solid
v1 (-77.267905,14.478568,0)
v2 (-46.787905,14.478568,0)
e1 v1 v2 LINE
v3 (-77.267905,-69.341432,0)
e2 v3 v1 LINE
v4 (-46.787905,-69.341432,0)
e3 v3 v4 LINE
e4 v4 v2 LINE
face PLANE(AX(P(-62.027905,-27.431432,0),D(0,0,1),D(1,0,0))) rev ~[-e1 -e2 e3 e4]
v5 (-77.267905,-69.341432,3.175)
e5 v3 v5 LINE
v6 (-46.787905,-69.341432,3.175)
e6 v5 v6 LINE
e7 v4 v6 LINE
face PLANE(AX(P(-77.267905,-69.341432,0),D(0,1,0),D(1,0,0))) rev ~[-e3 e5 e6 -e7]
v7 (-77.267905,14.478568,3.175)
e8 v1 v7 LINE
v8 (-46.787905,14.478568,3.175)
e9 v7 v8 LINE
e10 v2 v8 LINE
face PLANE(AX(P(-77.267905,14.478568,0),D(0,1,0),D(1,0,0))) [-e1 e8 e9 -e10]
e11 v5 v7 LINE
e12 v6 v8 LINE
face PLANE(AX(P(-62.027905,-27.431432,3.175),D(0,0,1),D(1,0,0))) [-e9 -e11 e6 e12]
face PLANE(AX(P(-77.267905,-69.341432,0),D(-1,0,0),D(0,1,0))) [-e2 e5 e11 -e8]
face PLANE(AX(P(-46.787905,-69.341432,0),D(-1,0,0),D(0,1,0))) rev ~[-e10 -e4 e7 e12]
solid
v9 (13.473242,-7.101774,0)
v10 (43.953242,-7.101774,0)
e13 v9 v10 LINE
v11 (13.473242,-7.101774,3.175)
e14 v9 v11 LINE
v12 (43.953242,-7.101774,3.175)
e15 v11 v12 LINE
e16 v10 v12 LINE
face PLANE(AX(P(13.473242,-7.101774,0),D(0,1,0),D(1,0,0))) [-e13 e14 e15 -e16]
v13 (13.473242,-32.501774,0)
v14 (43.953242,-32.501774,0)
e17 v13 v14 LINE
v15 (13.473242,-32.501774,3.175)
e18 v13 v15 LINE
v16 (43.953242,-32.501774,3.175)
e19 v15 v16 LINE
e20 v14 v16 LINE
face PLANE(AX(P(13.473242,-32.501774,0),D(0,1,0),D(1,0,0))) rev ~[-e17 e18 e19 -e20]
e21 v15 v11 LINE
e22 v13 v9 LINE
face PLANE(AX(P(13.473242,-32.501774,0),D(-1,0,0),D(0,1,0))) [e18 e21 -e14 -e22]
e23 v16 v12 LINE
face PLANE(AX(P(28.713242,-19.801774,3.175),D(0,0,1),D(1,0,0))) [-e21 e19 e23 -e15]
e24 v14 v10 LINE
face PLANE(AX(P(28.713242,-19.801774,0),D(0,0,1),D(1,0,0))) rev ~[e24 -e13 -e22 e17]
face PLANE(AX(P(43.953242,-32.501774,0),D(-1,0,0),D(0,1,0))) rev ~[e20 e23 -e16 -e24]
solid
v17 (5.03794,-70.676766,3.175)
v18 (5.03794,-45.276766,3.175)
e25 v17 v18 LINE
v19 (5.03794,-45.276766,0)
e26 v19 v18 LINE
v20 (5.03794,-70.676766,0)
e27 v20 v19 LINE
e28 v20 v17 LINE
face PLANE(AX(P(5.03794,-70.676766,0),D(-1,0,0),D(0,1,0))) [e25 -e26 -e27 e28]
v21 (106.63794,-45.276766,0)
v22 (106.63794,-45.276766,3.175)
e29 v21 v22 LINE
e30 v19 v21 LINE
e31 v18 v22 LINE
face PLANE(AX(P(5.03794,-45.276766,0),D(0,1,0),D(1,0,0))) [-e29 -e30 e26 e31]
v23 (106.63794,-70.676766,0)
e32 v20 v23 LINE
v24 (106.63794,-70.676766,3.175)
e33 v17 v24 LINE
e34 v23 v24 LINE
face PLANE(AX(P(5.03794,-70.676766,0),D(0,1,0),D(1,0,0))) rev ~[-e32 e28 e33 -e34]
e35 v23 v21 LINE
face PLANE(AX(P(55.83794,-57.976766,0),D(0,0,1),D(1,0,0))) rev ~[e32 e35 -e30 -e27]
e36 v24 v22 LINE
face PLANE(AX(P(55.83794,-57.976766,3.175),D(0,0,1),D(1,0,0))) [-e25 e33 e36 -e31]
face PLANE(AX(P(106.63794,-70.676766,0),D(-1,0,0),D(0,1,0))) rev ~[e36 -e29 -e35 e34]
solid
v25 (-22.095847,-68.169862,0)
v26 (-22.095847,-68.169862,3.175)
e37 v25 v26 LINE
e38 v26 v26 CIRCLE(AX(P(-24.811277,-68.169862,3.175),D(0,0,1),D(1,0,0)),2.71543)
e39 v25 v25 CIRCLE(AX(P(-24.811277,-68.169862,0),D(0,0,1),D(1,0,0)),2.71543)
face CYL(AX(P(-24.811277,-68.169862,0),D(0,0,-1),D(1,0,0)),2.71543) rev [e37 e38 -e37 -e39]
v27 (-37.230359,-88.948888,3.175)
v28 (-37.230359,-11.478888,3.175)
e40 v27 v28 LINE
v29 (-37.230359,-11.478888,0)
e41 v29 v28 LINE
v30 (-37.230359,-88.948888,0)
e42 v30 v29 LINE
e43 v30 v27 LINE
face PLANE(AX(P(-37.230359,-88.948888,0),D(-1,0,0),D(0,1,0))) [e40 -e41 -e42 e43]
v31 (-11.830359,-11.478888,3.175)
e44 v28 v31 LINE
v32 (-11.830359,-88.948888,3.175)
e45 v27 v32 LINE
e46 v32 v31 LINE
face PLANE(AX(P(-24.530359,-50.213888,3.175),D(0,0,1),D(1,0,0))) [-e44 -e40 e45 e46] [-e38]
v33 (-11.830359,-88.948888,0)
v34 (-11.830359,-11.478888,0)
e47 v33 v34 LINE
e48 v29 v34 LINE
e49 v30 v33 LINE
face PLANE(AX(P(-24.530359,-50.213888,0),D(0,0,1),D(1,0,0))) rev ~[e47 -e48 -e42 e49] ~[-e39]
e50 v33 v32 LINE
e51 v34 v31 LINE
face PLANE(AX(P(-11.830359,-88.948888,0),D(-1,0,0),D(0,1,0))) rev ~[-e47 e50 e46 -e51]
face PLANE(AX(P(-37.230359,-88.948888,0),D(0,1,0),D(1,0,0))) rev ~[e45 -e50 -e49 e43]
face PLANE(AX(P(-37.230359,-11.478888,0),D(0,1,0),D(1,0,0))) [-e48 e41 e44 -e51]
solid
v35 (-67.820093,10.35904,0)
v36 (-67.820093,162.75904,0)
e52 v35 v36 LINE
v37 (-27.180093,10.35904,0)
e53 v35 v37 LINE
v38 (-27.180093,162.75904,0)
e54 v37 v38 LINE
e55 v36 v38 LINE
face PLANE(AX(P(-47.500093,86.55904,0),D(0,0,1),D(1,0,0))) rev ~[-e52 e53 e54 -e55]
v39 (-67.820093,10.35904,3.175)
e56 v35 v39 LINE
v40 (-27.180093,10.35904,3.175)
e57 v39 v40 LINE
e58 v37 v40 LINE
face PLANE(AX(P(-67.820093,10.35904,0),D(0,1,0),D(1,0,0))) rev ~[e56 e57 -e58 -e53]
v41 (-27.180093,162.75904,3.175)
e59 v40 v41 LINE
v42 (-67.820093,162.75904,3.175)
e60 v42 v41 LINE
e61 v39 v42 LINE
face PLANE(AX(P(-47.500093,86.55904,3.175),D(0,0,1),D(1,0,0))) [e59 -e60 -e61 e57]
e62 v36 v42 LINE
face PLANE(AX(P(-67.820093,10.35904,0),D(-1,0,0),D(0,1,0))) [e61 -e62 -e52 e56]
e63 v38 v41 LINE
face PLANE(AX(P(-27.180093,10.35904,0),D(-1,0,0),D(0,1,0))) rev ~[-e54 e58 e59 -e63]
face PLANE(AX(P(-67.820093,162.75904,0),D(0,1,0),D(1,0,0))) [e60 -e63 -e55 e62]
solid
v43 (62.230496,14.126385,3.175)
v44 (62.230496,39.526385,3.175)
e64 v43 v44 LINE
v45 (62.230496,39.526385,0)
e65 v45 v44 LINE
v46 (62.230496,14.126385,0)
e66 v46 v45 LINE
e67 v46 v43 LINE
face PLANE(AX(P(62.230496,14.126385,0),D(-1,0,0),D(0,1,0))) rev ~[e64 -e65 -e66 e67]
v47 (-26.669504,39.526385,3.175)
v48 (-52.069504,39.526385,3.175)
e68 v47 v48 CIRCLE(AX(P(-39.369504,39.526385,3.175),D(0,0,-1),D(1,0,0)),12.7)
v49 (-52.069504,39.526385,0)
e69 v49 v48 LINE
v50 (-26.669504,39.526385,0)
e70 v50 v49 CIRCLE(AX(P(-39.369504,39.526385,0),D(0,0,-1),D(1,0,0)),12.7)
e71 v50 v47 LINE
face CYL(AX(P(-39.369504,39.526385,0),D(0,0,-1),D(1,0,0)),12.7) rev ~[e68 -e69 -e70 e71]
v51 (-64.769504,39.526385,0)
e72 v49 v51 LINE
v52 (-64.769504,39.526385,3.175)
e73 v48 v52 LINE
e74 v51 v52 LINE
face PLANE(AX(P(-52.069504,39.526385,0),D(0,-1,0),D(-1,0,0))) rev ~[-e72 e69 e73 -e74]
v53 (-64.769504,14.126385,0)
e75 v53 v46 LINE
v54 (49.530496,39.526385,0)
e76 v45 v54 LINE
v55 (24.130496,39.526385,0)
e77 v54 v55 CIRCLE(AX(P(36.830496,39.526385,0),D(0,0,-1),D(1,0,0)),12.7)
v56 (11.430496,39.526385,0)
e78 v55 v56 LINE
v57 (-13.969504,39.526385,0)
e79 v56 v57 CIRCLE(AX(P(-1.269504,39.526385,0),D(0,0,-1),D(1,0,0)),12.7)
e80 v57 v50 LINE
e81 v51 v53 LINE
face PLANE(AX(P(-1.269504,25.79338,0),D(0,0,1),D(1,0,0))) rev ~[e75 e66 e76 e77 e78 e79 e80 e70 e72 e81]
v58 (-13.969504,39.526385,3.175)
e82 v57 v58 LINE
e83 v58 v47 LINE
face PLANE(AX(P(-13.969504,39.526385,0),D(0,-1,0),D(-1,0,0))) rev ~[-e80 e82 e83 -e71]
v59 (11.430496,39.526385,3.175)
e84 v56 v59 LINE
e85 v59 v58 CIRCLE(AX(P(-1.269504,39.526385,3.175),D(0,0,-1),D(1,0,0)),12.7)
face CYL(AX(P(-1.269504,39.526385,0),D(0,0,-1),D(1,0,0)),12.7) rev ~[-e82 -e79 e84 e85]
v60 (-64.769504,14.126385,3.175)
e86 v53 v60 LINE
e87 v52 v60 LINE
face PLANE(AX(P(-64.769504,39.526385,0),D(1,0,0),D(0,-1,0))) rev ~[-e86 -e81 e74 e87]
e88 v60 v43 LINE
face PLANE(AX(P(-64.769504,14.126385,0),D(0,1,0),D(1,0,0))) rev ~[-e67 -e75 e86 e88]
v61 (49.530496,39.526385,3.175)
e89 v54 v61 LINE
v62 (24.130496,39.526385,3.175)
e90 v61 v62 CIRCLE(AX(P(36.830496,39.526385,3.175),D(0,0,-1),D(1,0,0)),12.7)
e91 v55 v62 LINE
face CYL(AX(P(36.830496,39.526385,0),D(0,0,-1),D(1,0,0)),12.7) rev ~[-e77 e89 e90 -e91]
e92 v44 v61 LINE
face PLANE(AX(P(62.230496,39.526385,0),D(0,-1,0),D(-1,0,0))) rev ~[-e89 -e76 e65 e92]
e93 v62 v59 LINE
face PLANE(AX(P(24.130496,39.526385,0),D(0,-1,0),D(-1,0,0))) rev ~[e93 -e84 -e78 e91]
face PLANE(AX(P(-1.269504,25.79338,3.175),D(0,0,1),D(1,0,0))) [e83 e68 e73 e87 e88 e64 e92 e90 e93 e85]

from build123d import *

# Parameters (mm, degrees)
F1_DEPTH  = 3.175
F2_W      = 30.48
F2_H      = 83.82
F3_DEPTH  = 3.175
F4_W      = 25.4
F4_H      = 77.47
F4_R      = 2.7154298689
F5_DEPTH  = 3.175
F6_W      = 30.48
F6_H      = 25.4
F7_DEPTH  = 3.175
F8_W      = 101.6
F8_H      = 25.4
F9_DEPTH  = 3.175
F10_W     = 40.64
F10_H     = 152.4
F11_DEPTH = 3.175


# Not quite as in the source:
# - a length typed as a fraction of an inch, garbled in the dataset ("3 / 203.2 mm" for 3/8 in), is restored


with BuildPart() as f1:
    # F0 (on Top) → F1 (new body)
    with BuildSketch(Plane.XY):
        with BuildLine():
            Line((-52.0695035428, 39.5263851967), (-64.7695035428, 39.5263851967))
            Line((-64.7695035428, 39.5263851967), (-64.7695035428, 14.1263851967))
            Line((-64.7695035428, 14.1263851967), (62.2304964572, 14.1263851967))
            Line((62.2304964572, 14.1263851967), (62.2304964572, 39.5263851967))
            Line((62.2304964572, 39.5263851967), (49.5304964572, 39.5263851967))
            ThreePointArc((49.5304964572, 39.5263851967), (36.8304964572, 26.8263851967), (24.1304964572, 39.5263851967))
            Line((24.1304964572, 39.5263851967), (11.4304964572, 39.5263851967))
            ThreePointArc((11.4304964572, 39.5263851967), (-1.2695035428, 26.8263851967), (-13.9695035428, 39.5263851967))
            Line((-13.9695035428, 39.5263851967), (-26.6695035428, 39.5263851967))
            ThreePointArc((-26.6695035428, 39.5263851967), (-39.3695035428, 26.8263851967), (-52.0695035428, 39.5263851967))
        make_face()
    extrude(amount=F1_DEPTH)


with BuildPart() as f3:
    # F2 (on Top) → F3 (new body)
    with BuildSketch(Plane.XY):
        with Locations((-62.027904564, -27.4314320334)):
            Rectangle(F2_W, F2_H)
    extrude(amount=F3_DEPTH)


with BuildPart() as f5:
    # F4 (on Top) → F5 (new body)
    with BuildSketch(Plane.XY):
        with Locations((-24.5303590782, -50.2138879341)):
            Rectangle(F4_W, F4_H)
        with Locations((-24.811277166, -68.1698620319)):
            Circle(F4_R, mode=Mode.SUBTRACT)
    extrude(amount=F5_DEPTH)


with BuildPart() as f7:
    # F6 (on Top) → F7 (new body)
    with BuildSketch(Plane.XY):
        with Locations((28.7132419021, -19.8017735619)):
            Rectangle(F6_W, F6_H)
    extrude(amount=F7_DEPTH)


with BuildPart() as f9:
    # F8 (on Top) → F9 (new body)
    with BuildSketch(Plane.XY):
        with Locations((55.8379401919, -57.9767658847)):
            Rectangle(F8_W, F8_H)
    extrude(amount=F9_DEPTH)


with BuildPart() as f11:
    # F10 (on Top) → F11 (new body)
    with BuildSketch(Plane.XY):
        with Locations((-47.5000926219, 86.5590404719)):
            Rectangle(F10_W, F10_H)
    extrude(amount=F11_DEPTH)


solid = Compound([f1.part, f3.part, f5.part, f7.part, f9.part, f11.part])
